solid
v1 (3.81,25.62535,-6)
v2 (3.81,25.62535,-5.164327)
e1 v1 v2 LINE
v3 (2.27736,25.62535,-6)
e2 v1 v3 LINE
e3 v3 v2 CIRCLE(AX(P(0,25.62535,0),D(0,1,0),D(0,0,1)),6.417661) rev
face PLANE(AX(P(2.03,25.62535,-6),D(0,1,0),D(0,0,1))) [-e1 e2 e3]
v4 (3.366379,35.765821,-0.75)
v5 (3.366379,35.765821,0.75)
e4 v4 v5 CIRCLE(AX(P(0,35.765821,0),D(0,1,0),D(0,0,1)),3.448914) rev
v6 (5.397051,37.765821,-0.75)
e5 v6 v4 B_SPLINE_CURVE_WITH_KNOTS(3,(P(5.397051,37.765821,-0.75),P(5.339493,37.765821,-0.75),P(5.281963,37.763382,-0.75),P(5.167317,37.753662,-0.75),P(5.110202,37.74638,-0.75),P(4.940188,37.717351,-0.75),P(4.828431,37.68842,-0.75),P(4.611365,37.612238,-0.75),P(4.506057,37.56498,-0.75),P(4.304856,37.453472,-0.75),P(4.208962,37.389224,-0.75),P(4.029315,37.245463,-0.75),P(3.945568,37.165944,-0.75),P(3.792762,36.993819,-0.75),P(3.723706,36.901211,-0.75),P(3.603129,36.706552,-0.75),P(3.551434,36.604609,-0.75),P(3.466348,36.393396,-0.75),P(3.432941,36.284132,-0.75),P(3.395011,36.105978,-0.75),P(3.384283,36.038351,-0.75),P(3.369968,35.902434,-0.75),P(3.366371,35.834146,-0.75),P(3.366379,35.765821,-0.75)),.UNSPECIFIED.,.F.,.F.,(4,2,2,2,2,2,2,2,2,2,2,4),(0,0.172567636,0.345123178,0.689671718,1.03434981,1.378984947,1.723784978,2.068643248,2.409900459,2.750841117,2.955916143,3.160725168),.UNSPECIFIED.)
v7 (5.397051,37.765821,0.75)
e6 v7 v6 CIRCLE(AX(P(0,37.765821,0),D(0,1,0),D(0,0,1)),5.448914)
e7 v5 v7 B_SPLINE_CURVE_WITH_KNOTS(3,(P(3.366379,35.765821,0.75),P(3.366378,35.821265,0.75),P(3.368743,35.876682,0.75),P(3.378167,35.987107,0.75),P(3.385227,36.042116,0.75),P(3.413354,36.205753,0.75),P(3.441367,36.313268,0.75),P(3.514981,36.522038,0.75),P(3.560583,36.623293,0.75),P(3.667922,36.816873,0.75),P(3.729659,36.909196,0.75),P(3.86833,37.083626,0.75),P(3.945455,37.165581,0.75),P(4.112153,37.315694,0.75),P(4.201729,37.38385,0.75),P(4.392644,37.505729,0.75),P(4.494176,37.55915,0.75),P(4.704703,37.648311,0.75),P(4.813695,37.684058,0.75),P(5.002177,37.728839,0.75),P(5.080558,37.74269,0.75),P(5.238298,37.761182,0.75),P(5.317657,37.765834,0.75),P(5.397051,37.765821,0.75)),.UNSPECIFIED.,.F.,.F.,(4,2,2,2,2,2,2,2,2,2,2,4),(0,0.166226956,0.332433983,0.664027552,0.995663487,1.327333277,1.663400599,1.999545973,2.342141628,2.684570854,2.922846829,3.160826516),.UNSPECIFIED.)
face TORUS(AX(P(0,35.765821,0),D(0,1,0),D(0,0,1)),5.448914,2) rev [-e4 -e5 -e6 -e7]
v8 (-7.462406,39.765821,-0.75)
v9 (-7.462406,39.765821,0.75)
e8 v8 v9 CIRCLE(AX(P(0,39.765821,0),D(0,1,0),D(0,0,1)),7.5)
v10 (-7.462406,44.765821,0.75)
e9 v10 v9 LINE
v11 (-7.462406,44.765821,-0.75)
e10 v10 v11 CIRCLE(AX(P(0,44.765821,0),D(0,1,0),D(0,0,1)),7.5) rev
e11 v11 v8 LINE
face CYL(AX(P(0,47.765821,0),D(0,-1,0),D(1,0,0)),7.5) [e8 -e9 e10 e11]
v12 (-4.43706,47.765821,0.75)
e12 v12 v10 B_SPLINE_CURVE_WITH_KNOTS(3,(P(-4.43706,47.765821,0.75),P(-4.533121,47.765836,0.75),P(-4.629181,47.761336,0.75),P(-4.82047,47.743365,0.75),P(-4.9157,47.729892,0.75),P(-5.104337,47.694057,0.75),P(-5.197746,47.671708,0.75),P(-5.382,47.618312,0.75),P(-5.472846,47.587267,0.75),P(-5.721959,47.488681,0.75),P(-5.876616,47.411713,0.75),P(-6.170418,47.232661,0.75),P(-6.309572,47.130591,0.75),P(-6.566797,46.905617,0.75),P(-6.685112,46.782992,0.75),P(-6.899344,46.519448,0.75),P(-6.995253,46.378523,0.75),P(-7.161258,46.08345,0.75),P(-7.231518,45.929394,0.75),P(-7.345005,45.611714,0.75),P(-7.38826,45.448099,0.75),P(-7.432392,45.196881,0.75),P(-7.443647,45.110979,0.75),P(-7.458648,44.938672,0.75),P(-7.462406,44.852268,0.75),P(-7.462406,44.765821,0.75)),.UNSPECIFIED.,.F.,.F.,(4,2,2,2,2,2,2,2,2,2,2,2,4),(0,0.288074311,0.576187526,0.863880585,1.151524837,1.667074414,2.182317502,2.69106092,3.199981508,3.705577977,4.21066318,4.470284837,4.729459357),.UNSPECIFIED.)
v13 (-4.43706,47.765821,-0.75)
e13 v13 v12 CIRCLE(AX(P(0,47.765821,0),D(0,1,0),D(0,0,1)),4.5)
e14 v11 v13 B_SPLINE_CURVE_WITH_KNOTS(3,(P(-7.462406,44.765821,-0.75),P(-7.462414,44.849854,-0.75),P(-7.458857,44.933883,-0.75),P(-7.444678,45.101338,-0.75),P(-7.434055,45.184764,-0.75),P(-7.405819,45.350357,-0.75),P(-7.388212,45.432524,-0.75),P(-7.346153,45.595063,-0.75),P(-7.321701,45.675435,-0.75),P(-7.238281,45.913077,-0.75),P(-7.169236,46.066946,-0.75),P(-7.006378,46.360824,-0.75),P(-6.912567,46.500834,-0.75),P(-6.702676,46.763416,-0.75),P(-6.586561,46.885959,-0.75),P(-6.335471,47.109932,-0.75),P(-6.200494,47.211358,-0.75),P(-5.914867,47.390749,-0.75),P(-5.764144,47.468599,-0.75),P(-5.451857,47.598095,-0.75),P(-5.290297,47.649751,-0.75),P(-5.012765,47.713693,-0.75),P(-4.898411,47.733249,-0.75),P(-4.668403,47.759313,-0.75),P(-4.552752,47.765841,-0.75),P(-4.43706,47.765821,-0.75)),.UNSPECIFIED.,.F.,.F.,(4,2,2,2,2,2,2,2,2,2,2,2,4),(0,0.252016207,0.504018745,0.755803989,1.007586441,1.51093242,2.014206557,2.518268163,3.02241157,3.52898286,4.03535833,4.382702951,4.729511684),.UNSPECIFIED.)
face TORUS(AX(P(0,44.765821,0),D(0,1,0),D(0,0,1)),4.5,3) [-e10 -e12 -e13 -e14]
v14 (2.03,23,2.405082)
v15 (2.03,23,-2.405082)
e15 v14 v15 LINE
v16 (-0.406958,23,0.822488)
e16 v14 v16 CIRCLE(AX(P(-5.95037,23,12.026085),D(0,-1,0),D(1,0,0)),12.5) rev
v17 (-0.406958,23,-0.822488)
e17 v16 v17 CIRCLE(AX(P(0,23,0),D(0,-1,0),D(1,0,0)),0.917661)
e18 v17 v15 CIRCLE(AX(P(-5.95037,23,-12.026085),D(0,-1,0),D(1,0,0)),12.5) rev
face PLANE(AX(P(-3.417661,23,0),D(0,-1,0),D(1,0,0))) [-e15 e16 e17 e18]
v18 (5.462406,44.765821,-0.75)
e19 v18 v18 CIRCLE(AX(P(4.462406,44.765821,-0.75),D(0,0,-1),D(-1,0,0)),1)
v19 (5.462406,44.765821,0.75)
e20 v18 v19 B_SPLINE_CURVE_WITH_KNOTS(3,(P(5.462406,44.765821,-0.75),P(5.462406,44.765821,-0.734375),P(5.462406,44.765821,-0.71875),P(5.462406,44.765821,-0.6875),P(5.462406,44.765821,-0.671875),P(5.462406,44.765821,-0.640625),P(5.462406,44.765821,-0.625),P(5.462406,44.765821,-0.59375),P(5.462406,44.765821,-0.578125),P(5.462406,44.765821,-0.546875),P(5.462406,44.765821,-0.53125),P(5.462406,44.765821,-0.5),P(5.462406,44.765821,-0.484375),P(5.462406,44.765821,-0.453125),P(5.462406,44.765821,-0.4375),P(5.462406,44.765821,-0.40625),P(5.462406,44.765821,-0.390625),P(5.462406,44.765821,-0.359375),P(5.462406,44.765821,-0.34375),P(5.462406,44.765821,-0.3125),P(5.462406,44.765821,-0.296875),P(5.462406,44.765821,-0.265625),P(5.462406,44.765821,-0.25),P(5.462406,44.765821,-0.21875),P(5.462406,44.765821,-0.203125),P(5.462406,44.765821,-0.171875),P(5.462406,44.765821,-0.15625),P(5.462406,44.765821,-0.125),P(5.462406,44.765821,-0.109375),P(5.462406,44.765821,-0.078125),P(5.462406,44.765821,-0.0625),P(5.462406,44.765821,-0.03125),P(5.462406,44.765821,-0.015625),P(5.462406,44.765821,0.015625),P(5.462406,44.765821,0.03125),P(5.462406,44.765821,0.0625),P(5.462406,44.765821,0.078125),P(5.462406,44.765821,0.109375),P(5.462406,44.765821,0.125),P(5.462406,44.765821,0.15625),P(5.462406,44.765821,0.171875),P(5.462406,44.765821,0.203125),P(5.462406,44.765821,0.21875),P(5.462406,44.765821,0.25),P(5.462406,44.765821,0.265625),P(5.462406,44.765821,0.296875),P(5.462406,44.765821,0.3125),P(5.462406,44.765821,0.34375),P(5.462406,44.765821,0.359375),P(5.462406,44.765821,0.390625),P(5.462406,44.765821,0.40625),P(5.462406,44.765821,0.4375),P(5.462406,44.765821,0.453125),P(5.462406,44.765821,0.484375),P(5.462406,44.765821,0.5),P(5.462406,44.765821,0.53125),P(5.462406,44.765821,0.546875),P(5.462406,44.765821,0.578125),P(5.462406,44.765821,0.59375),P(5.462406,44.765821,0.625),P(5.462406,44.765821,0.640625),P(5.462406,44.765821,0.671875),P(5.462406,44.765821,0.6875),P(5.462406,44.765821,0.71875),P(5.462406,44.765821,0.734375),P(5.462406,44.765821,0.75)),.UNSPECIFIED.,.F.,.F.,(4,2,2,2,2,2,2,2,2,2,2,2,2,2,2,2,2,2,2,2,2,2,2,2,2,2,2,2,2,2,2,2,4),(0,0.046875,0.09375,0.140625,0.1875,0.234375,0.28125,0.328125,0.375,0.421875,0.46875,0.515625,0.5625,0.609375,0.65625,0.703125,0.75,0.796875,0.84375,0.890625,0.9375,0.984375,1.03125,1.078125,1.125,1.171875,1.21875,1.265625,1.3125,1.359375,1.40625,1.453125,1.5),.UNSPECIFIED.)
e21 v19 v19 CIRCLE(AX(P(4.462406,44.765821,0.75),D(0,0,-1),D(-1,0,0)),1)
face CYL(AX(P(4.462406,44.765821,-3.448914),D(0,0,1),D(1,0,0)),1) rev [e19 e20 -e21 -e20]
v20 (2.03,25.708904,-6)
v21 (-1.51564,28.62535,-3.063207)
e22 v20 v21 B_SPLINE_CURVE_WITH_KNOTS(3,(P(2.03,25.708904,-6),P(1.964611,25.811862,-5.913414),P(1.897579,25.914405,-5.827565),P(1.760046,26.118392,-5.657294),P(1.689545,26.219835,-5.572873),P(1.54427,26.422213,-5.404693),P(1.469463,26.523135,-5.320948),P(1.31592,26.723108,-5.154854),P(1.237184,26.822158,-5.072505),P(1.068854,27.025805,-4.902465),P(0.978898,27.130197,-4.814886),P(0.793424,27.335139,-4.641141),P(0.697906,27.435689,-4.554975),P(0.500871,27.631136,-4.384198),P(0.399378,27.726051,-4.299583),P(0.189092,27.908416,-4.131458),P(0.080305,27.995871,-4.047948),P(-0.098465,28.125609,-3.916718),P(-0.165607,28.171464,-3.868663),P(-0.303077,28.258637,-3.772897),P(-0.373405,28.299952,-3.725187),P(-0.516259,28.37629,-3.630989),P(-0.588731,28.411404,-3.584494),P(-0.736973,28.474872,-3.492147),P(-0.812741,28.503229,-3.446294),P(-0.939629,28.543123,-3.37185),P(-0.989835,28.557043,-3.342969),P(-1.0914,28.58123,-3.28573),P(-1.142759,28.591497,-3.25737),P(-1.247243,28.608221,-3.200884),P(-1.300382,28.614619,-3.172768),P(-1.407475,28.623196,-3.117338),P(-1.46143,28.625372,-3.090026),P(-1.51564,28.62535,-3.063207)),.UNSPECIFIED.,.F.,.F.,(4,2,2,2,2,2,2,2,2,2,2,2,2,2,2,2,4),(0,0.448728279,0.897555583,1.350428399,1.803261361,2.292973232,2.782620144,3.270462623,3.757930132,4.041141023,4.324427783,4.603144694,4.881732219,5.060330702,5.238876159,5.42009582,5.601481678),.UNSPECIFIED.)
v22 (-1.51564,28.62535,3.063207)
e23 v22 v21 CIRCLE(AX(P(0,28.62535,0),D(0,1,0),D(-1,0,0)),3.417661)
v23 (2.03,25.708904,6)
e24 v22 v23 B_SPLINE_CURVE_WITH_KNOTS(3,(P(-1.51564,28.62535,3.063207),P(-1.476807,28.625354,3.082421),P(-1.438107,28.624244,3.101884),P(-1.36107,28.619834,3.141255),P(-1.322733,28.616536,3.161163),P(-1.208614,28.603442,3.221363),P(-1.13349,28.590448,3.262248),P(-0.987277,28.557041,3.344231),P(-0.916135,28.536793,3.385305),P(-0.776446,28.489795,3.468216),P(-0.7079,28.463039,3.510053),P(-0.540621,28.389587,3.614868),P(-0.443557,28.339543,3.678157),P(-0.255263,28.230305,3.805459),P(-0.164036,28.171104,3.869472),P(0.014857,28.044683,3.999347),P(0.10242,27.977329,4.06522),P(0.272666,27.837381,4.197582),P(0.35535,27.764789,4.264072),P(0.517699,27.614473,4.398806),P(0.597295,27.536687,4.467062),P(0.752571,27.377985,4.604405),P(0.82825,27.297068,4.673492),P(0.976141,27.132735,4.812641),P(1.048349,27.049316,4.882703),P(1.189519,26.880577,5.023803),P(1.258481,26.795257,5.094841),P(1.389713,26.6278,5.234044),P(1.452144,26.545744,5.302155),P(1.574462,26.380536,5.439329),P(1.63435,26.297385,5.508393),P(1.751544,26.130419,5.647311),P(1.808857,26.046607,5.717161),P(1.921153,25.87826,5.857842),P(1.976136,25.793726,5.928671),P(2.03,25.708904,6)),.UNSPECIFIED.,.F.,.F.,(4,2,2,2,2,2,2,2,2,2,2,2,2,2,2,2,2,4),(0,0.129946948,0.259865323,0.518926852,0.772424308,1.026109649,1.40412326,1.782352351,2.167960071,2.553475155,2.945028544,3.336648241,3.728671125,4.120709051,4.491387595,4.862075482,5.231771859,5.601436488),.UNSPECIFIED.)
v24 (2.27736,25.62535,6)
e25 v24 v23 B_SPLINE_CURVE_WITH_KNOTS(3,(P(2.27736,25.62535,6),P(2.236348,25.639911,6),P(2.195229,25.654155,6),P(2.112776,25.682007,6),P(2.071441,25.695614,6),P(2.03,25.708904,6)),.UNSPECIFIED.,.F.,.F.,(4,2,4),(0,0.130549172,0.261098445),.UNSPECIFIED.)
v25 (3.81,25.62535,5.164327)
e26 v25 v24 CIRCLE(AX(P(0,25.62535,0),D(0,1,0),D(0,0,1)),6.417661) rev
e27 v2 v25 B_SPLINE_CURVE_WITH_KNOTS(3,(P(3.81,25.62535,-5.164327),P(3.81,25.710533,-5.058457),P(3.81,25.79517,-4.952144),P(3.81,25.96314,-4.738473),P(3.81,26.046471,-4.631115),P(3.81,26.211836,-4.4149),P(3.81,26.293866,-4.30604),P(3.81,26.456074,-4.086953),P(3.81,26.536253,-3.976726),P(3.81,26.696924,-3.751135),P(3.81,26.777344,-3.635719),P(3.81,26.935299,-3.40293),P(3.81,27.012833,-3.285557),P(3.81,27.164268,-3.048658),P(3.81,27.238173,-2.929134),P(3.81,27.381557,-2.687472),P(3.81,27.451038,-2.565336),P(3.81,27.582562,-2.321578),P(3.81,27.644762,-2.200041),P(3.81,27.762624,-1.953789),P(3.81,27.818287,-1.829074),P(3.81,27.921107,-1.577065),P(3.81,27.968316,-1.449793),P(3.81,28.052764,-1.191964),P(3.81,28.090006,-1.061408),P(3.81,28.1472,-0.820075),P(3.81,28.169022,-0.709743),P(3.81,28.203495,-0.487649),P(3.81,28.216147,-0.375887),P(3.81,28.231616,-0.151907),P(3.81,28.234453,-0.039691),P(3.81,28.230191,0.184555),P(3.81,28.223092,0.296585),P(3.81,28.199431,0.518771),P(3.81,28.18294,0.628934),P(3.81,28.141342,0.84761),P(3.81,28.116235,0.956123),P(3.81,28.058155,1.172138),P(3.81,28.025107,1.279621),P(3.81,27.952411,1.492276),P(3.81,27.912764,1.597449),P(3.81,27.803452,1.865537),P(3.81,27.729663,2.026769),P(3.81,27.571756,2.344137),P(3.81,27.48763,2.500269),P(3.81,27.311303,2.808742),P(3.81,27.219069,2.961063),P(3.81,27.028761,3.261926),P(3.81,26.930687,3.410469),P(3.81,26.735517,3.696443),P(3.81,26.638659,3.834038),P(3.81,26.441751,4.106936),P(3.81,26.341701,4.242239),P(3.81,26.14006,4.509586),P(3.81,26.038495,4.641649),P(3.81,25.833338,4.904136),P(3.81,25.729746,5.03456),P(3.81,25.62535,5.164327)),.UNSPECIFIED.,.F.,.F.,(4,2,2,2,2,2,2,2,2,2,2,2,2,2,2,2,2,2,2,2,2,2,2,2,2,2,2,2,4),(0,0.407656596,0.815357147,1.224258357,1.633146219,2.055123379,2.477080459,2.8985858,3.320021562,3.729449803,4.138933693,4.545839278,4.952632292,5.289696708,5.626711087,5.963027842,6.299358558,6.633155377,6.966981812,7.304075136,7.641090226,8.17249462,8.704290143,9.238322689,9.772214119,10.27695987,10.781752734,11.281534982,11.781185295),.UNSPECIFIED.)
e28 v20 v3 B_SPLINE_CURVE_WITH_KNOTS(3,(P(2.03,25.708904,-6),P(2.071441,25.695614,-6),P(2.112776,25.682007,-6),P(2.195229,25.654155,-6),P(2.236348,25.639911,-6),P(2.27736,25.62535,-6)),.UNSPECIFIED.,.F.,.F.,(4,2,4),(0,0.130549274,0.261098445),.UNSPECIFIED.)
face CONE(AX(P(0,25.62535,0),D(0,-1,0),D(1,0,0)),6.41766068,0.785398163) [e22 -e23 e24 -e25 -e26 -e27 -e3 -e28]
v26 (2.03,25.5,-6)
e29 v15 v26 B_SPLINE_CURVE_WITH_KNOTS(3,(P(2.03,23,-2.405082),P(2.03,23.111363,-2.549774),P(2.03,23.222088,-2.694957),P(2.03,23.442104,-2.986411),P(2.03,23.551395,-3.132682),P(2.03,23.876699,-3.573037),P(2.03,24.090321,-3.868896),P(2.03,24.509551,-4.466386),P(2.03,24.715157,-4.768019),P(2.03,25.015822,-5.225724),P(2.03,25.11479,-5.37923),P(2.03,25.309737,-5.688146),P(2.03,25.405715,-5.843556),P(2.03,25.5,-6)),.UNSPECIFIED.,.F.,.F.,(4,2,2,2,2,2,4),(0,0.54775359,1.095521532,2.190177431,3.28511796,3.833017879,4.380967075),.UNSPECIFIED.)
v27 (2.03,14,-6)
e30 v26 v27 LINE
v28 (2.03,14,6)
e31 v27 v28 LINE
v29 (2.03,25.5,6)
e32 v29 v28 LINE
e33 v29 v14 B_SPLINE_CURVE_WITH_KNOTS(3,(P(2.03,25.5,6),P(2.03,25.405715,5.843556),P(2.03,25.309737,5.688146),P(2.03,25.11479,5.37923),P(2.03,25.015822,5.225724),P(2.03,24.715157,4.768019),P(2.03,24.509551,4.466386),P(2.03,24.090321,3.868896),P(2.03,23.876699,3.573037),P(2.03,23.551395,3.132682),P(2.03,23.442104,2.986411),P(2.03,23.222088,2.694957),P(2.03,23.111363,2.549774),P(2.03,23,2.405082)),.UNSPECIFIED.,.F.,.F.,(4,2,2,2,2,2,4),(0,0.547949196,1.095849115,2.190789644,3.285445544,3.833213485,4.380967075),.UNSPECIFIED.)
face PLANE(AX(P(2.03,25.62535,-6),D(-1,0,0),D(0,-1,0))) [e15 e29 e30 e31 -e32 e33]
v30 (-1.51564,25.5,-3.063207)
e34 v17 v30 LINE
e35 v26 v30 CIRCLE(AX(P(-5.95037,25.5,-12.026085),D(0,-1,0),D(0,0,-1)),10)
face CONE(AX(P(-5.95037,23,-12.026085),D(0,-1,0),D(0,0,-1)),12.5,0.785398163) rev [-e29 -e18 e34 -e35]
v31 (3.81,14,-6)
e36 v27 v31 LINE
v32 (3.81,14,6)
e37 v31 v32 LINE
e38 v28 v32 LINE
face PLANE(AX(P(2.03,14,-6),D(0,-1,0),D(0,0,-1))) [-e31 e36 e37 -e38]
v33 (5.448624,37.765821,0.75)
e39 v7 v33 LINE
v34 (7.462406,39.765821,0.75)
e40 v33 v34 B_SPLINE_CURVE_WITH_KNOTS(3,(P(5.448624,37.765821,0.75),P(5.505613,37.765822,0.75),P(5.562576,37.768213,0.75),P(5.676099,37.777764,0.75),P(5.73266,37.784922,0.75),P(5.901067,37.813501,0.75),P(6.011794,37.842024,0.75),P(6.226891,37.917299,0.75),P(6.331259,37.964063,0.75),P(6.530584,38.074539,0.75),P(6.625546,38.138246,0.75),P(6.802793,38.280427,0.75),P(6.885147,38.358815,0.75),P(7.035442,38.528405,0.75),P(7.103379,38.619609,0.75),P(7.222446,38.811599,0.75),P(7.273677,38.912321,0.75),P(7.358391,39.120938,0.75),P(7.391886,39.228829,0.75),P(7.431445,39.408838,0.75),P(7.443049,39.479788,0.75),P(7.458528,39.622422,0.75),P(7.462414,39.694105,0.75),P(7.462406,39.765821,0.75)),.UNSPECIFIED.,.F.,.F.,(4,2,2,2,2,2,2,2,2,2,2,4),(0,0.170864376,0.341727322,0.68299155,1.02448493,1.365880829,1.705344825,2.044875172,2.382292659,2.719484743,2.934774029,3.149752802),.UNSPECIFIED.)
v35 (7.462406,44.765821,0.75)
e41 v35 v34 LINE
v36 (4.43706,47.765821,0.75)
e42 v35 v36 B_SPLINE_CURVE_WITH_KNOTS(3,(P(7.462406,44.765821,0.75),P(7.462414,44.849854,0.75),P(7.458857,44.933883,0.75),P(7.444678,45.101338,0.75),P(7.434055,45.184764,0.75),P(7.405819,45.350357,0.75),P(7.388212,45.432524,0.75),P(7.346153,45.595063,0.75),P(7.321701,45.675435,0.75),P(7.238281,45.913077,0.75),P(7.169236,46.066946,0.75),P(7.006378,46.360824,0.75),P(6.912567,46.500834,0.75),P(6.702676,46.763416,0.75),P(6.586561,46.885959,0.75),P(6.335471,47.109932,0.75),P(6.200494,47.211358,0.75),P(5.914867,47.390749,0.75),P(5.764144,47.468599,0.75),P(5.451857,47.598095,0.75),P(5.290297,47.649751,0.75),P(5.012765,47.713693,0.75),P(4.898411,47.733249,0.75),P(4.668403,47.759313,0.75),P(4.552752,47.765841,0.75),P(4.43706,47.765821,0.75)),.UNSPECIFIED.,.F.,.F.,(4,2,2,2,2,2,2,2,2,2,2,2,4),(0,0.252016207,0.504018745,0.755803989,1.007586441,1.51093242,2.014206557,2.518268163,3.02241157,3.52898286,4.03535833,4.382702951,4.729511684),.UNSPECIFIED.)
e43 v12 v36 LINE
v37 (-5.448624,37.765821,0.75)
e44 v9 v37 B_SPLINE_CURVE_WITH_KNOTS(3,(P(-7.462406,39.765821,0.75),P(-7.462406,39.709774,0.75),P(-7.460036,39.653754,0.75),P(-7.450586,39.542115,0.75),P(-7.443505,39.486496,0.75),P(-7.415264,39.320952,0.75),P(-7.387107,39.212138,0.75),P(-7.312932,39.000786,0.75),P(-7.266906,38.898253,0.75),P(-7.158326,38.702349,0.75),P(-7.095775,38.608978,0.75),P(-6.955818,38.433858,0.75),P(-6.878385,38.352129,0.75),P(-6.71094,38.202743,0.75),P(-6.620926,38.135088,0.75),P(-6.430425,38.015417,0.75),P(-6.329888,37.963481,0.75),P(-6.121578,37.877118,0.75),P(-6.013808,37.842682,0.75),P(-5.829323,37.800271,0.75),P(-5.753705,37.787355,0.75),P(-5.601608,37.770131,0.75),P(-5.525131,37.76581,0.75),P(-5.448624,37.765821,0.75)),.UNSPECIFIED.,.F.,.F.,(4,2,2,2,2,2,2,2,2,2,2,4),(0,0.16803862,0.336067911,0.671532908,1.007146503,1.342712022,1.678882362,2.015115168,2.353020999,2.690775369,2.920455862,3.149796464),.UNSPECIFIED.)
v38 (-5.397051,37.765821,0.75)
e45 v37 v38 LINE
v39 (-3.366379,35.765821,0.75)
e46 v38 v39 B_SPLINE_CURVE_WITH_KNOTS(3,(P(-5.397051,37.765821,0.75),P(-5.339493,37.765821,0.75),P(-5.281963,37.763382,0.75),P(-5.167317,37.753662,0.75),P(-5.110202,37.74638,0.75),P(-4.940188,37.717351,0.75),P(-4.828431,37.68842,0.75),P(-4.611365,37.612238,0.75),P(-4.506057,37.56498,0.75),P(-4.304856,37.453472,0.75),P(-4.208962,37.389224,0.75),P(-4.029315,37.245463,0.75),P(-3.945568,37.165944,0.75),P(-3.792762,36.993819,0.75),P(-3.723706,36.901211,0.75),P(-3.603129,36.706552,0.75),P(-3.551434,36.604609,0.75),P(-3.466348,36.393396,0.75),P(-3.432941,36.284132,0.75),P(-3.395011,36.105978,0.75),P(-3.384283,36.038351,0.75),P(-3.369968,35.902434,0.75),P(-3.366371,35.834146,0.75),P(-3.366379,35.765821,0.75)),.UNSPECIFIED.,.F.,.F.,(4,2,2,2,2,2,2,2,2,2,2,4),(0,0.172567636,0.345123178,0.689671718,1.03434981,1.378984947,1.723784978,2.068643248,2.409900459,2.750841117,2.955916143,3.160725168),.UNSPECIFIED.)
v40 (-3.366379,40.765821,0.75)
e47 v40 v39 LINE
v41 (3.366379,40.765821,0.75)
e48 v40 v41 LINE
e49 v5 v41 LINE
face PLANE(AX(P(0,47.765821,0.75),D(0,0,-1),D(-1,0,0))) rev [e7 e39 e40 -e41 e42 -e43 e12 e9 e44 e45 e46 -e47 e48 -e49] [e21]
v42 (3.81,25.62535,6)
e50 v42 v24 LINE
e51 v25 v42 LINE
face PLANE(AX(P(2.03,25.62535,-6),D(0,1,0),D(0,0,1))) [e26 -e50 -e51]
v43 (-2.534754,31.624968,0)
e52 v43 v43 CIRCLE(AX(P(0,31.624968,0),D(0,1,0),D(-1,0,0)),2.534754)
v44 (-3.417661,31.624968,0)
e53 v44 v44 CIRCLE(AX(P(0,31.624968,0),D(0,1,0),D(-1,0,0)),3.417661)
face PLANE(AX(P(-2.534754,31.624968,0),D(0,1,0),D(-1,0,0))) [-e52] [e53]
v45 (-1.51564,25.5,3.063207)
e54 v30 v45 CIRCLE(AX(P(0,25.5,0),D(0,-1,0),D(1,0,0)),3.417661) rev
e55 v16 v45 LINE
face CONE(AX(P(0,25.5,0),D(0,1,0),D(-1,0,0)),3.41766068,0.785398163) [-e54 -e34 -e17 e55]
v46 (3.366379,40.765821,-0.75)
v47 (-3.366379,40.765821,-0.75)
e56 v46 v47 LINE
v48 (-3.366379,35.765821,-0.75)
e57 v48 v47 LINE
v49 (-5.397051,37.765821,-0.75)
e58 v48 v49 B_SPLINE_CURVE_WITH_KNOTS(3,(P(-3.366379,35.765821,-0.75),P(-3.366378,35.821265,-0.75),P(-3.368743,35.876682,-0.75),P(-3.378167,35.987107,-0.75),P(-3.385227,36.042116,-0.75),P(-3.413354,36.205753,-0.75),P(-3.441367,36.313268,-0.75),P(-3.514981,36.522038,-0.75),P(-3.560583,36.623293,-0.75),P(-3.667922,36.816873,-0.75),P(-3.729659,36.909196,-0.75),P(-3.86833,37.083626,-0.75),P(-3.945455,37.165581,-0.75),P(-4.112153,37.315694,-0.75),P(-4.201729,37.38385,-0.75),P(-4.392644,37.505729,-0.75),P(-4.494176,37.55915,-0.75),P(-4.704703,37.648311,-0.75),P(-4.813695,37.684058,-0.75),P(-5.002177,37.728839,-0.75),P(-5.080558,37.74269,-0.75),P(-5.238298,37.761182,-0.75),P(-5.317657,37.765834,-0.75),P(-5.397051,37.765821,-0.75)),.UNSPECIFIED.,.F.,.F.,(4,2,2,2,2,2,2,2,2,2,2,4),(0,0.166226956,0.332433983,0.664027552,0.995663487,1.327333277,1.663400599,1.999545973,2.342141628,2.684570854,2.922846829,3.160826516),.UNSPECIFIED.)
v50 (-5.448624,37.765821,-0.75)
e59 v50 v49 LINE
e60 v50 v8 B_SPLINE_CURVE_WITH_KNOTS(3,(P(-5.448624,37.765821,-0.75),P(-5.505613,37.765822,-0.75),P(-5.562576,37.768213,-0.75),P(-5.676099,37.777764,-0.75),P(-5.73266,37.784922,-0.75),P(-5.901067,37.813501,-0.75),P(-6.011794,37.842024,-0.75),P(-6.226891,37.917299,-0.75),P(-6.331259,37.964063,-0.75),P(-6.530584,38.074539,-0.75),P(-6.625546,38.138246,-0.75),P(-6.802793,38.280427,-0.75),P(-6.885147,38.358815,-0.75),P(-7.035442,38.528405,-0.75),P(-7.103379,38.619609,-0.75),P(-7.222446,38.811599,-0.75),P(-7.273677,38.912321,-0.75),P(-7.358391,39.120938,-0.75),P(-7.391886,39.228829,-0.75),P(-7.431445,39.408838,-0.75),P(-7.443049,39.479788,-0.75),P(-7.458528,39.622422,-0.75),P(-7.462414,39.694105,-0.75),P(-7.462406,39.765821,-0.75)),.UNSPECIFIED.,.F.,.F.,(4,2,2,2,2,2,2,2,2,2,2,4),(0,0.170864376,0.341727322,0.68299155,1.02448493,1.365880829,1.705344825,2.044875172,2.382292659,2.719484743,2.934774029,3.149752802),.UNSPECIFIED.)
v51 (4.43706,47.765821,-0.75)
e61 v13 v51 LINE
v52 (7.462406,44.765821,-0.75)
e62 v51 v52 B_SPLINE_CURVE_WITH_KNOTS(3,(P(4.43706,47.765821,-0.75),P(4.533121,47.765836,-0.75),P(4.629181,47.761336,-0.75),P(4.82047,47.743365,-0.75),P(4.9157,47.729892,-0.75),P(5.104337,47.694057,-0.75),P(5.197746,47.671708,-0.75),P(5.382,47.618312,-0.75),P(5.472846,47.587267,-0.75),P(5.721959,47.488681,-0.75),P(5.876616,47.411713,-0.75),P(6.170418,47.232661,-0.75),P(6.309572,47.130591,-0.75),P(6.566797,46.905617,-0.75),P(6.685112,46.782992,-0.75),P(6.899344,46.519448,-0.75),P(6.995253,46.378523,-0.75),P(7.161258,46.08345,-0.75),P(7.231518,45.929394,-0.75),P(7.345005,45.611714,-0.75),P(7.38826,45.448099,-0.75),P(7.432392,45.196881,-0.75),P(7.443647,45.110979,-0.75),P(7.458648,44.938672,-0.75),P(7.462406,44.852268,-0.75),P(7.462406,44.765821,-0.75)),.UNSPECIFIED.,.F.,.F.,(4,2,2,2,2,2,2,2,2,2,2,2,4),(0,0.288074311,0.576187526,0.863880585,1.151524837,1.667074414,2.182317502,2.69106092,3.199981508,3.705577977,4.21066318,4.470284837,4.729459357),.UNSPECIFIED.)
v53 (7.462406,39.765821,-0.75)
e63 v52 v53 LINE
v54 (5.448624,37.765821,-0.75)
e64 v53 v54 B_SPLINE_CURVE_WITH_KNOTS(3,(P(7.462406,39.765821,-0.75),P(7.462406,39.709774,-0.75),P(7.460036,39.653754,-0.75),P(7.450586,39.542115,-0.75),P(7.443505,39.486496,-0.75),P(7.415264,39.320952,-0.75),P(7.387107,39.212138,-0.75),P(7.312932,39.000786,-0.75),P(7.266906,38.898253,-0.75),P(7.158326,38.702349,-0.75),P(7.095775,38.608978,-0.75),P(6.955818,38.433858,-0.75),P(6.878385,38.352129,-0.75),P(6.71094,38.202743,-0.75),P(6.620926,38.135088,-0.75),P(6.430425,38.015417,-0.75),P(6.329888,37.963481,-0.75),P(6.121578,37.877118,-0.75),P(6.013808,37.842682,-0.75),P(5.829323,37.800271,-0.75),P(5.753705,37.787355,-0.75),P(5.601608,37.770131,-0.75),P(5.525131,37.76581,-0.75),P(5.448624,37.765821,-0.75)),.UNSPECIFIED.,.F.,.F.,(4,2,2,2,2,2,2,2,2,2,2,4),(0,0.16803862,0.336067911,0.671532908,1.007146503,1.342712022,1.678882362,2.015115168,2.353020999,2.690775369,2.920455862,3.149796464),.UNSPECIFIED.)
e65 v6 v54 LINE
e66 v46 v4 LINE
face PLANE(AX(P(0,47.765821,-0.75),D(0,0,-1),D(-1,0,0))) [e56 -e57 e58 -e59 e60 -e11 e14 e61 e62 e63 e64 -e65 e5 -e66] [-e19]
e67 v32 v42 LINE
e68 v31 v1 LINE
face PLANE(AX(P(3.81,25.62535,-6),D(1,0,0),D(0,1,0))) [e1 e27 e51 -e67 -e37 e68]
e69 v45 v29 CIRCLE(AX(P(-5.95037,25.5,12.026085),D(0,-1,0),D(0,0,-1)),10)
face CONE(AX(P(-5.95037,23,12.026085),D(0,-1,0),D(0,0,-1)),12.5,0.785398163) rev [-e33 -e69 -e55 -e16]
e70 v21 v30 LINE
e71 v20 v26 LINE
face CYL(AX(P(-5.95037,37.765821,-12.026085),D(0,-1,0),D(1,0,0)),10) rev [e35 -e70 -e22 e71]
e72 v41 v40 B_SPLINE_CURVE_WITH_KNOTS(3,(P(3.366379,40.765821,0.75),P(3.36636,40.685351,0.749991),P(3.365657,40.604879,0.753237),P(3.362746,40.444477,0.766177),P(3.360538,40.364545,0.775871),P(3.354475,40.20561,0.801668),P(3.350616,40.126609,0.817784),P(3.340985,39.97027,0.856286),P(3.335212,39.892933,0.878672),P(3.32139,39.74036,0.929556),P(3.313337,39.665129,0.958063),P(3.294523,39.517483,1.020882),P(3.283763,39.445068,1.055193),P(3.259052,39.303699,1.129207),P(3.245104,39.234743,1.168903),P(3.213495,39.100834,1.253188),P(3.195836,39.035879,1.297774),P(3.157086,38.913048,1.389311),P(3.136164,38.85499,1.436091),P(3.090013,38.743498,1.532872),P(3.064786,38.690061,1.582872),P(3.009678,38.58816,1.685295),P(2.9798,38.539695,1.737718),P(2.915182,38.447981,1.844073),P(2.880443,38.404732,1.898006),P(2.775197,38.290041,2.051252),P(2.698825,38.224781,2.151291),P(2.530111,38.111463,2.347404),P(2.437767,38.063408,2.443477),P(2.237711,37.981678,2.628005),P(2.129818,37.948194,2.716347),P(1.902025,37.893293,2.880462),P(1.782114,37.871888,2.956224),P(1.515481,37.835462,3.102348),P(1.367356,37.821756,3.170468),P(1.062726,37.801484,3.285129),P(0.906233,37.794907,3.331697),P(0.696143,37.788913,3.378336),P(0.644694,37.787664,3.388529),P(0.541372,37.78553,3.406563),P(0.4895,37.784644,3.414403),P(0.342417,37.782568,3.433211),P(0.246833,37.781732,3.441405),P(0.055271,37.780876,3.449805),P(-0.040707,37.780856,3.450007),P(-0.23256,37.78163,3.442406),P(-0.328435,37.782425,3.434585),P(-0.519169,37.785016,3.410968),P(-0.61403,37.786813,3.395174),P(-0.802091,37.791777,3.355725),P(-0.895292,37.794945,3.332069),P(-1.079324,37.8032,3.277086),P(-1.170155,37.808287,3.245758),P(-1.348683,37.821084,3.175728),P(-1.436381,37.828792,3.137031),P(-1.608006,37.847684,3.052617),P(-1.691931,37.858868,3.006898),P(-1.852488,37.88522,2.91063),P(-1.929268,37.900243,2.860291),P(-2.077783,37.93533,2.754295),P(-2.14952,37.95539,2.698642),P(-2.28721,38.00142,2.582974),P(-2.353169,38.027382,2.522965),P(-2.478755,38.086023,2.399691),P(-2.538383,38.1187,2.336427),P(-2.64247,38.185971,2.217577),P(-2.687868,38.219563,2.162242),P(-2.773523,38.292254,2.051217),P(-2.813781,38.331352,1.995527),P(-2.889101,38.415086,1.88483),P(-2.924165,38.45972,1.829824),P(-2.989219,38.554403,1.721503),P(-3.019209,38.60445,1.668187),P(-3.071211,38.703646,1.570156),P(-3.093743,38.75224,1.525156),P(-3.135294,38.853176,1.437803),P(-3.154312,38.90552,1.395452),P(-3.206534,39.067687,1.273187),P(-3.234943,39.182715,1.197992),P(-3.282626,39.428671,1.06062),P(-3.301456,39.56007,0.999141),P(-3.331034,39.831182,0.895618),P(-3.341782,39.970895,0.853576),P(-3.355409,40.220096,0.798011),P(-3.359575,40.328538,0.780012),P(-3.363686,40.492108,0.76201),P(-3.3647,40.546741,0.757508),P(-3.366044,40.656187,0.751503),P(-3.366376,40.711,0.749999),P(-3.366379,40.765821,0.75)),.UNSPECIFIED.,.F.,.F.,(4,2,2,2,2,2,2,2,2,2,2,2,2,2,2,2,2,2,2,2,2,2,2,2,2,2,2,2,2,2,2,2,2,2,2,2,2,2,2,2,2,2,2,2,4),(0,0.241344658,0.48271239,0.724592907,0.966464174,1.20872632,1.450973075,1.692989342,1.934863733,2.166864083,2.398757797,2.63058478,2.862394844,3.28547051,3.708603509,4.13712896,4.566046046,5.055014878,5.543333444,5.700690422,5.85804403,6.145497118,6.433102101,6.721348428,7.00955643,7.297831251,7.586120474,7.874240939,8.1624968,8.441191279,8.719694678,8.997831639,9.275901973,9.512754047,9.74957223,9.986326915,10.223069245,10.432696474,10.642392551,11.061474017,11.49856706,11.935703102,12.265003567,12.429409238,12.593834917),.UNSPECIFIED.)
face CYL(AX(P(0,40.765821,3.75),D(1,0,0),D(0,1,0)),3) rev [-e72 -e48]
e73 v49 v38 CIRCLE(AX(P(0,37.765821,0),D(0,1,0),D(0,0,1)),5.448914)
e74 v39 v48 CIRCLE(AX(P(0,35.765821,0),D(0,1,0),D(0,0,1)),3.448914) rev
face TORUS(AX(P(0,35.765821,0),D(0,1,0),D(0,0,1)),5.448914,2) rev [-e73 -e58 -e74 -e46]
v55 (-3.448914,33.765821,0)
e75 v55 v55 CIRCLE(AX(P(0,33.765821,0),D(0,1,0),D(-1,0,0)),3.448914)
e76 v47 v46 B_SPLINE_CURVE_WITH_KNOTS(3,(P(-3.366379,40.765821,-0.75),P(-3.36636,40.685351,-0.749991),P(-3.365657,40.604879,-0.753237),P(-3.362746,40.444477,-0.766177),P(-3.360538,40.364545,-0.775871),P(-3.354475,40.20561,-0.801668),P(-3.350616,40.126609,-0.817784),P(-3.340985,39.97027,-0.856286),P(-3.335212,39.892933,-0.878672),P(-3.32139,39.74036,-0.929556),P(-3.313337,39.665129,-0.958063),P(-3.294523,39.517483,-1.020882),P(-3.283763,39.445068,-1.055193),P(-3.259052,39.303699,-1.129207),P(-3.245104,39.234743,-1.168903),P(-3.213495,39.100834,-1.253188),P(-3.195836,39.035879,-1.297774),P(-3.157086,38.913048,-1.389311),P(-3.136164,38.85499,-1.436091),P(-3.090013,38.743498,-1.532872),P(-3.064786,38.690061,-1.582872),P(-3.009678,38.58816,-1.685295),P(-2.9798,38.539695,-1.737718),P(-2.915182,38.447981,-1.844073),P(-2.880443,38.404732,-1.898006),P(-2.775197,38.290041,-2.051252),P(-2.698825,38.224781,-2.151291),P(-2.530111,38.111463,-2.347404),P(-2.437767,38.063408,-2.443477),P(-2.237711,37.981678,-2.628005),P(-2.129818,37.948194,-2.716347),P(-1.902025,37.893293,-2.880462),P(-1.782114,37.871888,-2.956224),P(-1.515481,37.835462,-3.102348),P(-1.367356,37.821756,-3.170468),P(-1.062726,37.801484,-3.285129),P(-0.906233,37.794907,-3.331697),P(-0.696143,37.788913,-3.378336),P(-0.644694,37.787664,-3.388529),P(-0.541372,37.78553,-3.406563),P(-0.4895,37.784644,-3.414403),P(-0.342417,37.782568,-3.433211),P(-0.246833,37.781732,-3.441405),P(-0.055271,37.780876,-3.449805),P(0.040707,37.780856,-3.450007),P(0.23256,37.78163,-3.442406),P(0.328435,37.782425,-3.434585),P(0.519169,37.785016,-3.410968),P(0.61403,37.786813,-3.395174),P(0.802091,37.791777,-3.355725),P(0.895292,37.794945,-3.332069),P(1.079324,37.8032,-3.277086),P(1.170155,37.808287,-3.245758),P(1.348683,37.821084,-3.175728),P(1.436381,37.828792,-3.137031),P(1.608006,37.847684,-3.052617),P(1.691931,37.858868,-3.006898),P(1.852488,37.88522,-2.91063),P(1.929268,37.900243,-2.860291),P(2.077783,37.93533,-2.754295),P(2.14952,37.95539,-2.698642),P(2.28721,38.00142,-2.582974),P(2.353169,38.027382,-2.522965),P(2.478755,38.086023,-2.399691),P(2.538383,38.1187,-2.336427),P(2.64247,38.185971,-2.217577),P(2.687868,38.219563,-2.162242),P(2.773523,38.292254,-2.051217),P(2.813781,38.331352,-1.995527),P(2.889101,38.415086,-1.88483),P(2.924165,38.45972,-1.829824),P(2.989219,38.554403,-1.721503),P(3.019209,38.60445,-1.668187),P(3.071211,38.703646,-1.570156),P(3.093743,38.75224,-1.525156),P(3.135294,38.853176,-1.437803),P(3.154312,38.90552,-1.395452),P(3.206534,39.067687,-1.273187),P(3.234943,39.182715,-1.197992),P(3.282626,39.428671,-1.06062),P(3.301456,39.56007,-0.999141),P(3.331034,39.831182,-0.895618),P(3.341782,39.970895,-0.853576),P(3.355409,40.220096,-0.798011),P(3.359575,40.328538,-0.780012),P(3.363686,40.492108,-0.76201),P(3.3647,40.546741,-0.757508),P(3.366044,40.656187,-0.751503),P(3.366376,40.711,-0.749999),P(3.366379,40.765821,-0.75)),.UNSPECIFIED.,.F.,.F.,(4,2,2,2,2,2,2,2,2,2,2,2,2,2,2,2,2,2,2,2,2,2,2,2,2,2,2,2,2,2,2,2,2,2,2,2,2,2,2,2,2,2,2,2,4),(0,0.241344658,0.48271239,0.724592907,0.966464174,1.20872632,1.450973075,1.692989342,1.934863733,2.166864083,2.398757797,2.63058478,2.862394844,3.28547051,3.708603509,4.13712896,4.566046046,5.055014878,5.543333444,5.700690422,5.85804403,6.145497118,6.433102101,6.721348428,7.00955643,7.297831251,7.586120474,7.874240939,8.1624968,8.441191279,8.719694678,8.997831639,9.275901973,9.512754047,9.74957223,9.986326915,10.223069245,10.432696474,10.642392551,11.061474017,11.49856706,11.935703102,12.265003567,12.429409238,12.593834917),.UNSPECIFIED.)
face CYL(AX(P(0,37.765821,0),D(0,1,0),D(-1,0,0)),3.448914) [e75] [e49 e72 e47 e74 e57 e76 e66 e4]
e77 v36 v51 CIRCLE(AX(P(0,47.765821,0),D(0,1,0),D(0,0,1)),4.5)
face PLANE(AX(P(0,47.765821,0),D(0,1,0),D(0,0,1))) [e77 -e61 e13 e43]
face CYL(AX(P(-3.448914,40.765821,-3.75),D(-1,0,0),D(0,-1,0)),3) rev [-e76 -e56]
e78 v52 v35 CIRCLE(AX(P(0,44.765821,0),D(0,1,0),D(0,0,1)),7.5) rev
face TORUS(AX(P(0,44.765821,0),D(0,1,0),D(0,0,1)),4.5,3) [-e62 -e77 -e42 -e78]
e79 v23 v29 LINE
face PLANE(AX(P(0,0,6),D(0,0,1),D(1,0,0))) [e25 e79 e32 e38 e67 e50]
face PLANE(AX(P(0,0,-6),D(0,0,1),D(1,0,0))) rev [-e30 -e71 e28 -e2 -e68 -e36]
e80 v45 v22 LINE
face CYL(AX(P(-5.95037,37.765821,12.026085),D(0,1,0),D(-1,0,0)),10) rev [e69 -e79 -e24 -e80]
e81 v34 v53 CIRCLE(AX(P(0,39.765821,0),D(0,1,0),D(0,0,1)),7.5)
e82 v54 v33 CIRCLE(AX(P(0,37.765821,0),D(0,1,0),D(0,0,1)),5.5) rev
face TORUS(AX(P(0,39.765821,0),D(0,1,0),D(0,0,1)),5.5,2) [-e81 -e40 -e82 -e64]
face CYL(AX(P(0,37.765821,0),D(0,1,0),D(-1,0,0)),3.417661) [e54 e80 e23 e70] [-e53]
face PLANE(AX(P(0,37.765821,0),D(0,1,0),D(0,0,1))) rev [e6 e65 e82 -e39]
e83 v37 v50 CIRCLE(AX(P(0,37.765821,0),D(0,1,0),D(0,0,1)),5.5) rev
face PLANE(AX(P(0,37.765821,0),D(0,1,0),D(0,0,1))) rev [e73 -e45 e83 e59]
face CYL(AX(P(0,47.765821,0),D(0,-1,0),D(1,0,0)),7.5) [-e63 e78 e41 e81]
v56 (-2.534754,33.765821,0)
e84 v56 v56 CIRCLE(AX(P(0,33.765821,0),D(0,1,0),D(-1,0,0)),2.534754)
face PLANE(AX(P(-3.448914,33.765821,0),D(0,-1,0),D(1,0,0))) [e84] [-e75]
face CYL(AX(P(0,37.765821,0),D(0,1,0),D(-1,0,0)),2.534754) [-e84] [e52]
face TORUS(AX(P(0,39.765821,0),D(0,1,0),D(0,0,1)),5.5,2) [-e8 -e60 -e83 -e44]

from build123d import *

# Parameters (mm, degrees)
BOSS_EXTRUDE1_DEPTH      = 10
FILLET2_R                = 2
FILLET3_R                = 3
CUT_EXTRUDE1_DEPTH       = 49.473897211
CUT_EXTRUDE1_DEPTH_BACK  = 49.473897211
SKETCH3_R                = 1
BOSS_EXTRUDE2_DEPTH      = 6
BOSS_EXTRUDE2_DEPTH_BACK = 6
SKETCH4_W                = 1.78
SKETCH4_H                = 11.625349657
CHAMFER1_SIZE            = 3
FILLET4_START            = 23
FILLET4_DEPTH            = 2.747219164
FILLET4_START_2          = 25.747219164
FILLET4_2_DEPTH          = 2.878130593
CHAMFER2_SIZE            = 2.5


with BuildPart() as part:
    # Sketch1 → Revolve1 (revolve)
    with BuildSketch(Plane.XY):
        Polygon((-3.448914015, 37.765821371), (-3.448914015, 33.765821371), (-2.534753992, 33.765821371), (-2.534753992, 31.624967984), (-3.41766068, 31.624967984), (-3.41766068, 23), (0, 23), (0, 37.765821371), align=None)
    revolve(axis=Axis((0, 37.765821371, 0), (0, -1, 0)))

    # Sketch2 → Boss-Extrude1 (add)
    with BuildSketch(Plane(origin=(0, 37.765821371, 0), x_dir=(1, 0, 0), z_dir=(0, 1, 0))):
        with BuildLine():
            Line((3.366379046, 0.75), (-3.366379046, 0.75))
            ThreePointArc((-3.366379046, 0.75), (-3.448914015, 0), (-3.366379046, -0.75))
            Line((-3.366379046, -0.75), (3.366379046, -0.75))
            ThreePointArc((3.366379046, -0.75), (3.428218178, -0.37726384), (3.448914015, 0))
            ThreePointArc((3.448914015, 0), (3.428218178, 0.37726384), (3.366379046, 0.75))
        make_face()
        with BuildLine():
            Line((-3.366379046, 0.75), (-7.462405778, 0.75))
            ThreePointArc((-7.462405778, 0.75), (-7.5, 0), (-7.462405778, -0.75))
            Line((-7.462405778, -0.75), (-3.366379046, -0.75))
            ThreePointArc((-3.366379046, -0.75), (-3.448914015, 0), (-3.366379046, 0.75))
        make_face()
        with BuildLine():
            ThreePointArc((7.5, 0), (7.490595548, 0.375470813), (7.462405778, 0.75))
            Line((7.462405778, 0.75), (3.366379046, 0.75))
            ThreePointArc((3.366379046, 0.75), (3.428218178, 0.37726384), (3.448914015, 0))
            ThreePointArc((3.448914015, 0), (3.428218178, -0.37726384), (3.366379046, -0.75))
            Line((3.366379046, -0.75), (7.462405778, -0.75))
            ThreePointArc((7.462405778, -0.75), (7.490595548, -0.375470813), (7.5, 0))
        make_face()
    extrude(amount=BOSS_EXTRUDE1_DEPTH)

    # Fillet2
    # the kernel refuses this fillet: 2 mm, written as the material it adds along each edge
    with BuildSketch(Plane(origin=(0, 37.765821371, 0), x_dir=(-0.09803421101524086, 0, -0.9951830452085783), z_dir=(-0.9951830452085783, 0, 0.09803421101524086))) as fillet2_piece_1_section:
        with BuildLine():
            CenterArc((3.448914015 + FILLET2_R, FILLET2_R), FILLET2_R, 180, 90)
            Line((3.448914015 + FILLET2_R, 0), (3.448914015, 0))
            Line((3.448914015, 0), (3.448914015, FILLET2_R))
        make_face()
    fillet2_piece_1 = revolve(axis=Axis((0, 37.765821371, 0), (0, -1, 0)), revolution_arc=191.251965623, mode=Mode.PRIVATE)
    fillet2_piece_1 = split(fillet2_piece_1, bisect_by=Plane(origin=(0, 37.765821371, -0.75), z_dir=(0, 0, 1)), keep=Keep.TOP, mode=Mode.PRIVATE)
    fillet2_piece_1 = split(fillet2_piece_1, bisect_by=Plane(origin=(0, 37.765821371, 0.75), z_dir=(0, 0, -1)), keep=Keep.TOP, mode=Mode.PRIVATE)
    add(fillet2_piece_1)
    with BuildSketch(Plane(origin=(0, 37.765821371, 0), x_dir=(0.09800035789508027, 0, 0.9951863794548418), z_dir=(0.9951863794548418, 0, -0.09800035789508027))) as fillet2_piece_2_section:
        with BuildLine():
            CenterArc((3.448914015 + FILLET2_R, FILLET2_R), FILLET2_R, 180, 90)
            Line((3.448914015 + FILLET2_R, 0), (3.448914015, 0))
            Line((3.448914015, 0), (3.448914015, FILLET2_R))
        make_face()
    fillet2_piece_2 = revolve(axis=Axis((0, 37.765821371, 0), (0, -1, 0)), revolution_arc=95.624033786, mode=Mode.PRIVATE)
    fillet2_piece_2 = split(fillet2_piece_2, bisect_by=Plane(origin=(0, 37.765821371, 0.75), z_dir=(0, 0, -1)), keep=Keep.TOP, mode=Mode.PRIVATE)
    add(fillet2_piece_2)
    with BuildSketch(Plane(origin=(0, 37.765821371, 0), x_dir=(-1, 0, 0), z_dir=(0, 0, 1))) as fillet2_piece_3_section:
        with BuildLine():
            CenterArc((3.448914015 + FILLET2_R, FILLET2_R), FILLET2_R, 180, 90)
            Line((3.448914015 + FILLET2_R, 0), (3.448914015, 0))
            Line((3.448914015, 0), (3.448914015, FILLET2_R))
        make_face()
    fillet2_piece_3 = revolve(axis=Axis((0, 37.765821371, 0), (0, -1, 0)), revolution_arc=95.624033786, mode=Mode.PRIVATE)
    fillet2_piece_3 = split(fillet2_piece_3, bisect_by=Plane(origin=(0, 37.765821371, -0.75), z_dir=(0, 0, 1)), keep=Keep.TOP, mode=Mode.PRIVATE)
    add(fillet2_piece_3)
    # the kernel refuses this fillet: 2 mm, written as the material it takes off along each edge
    with BuildSketch(Plane(origin=(0, 37.765821371, 0), x_dir=(-0.7201079494948177, 0, -0.6938620475817721), z_dir=(0.6938620475817721, 0, -0.7201079494948177))) as fillet2_2_piece_1:
        with BuildLine():
            CenterArc((7.5 - FILLET2_R, FILLET2_R), FILLET2_R, 270, 90)
            Line((7.5, FILLET2_R), (7.5, 0))
            Line((7.5, 0), (7.5 - FILLET2_R, 0))
        make_face()
    revolve(axis=Axis((0, 37.765821371, 0), (0, 1, 0)), revolution_arc=87.873212667, mode=Mode.SUBTRACT)
    with BuildSketch(Plane(origin=(0, 37.765821371, 0), x_dir=(0.7201079494948216, 0, 0.6938620475817678), z_dir=(-0.6938620475817678, 0, 0.7201079494948216))) as fillet2_2_piece_2:
        with BuildLine():
            CenterArc((7.5 - FILLET2_R, FILLET2_R), FILLET2_R, 270, 90)
            Line((7.5 - FILLET2_R, 0), (7.5, 0))
            Line((7.5, 0), (7.5, FILLET2_R))
        make_face()
    revolve(axis=Axis((0, 37.765821371, 0), (0, 1, 0)), revolution_arc=87.873212667, mode=Mode.SUBTRACT)

    # Fillet3
    # the kernel refuses this fillet: 3 mm, written as the material it adds along each edge
    with BuildSketch(Plane(origin=(10.866379046, 37.765821371, -0.75), x_dir=(0, 1, 0), z_dir=(-1, 0, 0))) as fillet3_piece_1_section:
        with BuildLine():
            CenterArc((FILLET3_R, FILLET3_R), FILLET3_R, 180, 90)
            Line((0, FILLET3_R), (0, 0))
            Line((0, 0), (FILLET3_R, 0))
        make_face()
    fillet3_piece_1 = extrude(amount=21.732758092, mode=Mode.PRIVATE)
    fillet3_piece_1 = fillet3_piece_1 & Plane(origin=(0, 37.765821371, 0), x_dir=(-1, 0, 0), z_dir=(0, -1, 0)) * Cylinder(3.448914015, 56, mode=Mode.PRIVATE)
    add(fillet3_piece_1)
    with BuildSketch(Plane(origin=(10.866379046, 37.765821371, 0.75), x_dir=(0, 1, 0), z_dir=(-1, 0, 0))) as fillet3_piece_2_section:
        with BuildLine():
            CenterArc((FILLET3_R, -FILLET3_R), FILLET3_R, 90, 90)
            Line((0, -FILLET3_R), (0, 0))
            Line((0, 0), (FILLET3_R, 0))
        make_face()
    fillet3_piece_2 = extrude(amount=21.732758092, mode=Mode.PRIVATE)
    fillet3_piece_2 = fillet3_piece_2 & Plane(origin=(0, 37.765821371, 0), x_dir=(-1, 0, 0), z_dir=(0, -1, 0)) * Cylinder(3.448914015, 56, mode=Mode.PRIVATE)
    add(fillet3_piece_2)
    # the kernel refuses this fillet: 3 mm, written as the material it takes off along each edge
    with BuildSketch(Plane(origin=(0, 47.765821371, 0), x_dir=(-0.4534410859899706, 0, -0.8912862511764871), z_dir=(0.8912862511764871, 0, -0.4534410859899706))) as fillet3_2_piece_1:
        with BuildLine():
            CenterArc((7.5 - FILLET3_R, -FILLET3_R), FILLET3_R, 0, 90)
            Line((7.5 - FILLET3_R, 0), (7.5, 0))
            Line((7.5, 0), (7.5, -FILLET3_R))
        make_face()
    revolve(axis=Axis((0, 47.765821371, 0), (0, 1, 0)), revolution_arc=126.070648523, mode=Mode.SUBTRACT)
    with BuildSketch(Plane(origin=(0, 47.765821371, 0), x_dir=(0.4534410859901425, 0, -0.8912862511763997), z_dir=(-0.8912862511763997, 0, -0.4534410859901425))) as fillet3_2_piece_2:
        with BuildLine():
            CenterArc((7.5 - FILLET3_R, FILLET3_R), FILLET3_R, 270, 90)
            Line((7.5, FILLET3_R), (7.5, 0))
            Line((7.5, 0), (7.5 - FILLET3_R, 0))
        make_face()
    revolve(axis=Axis((0, 47.765821371, 0), (0, -1, 0)), revolution_arc=126.070648523, mode=Mode.SUBTRACT)

    # Sketch3 → Cut-Extrude1 (cut, two sides: drawn at the far end of the back side and taken through both)
    with BuildSketch(Plane.XY.offset(-CUT_EXTRUDE1_DEPTH_BACK)):
        with Locations((4.462405778, 44.765821371)):
            Circle(SKETCH3_R)
    extrude(amount=CUT_EXTRUDE1_DEPTH + CUT_EXTRUDE1_DEPTH_BACK, mode=Mode.SUBTRACT)

    # Sketch4 → Boss-Extrude2 (add, two sides: drawn at the far end of the back side and taken through both)
    with BuildSketch(Plane.XY.offset(-BOSS_EXTRUDE2_DEPTH_BACK)):
        with Locations((2.92, 19.812674829)):
            Rectangle(SKETCH4_W, SKETCH4_H)
    extrude(amount=BOSS_EXTRUDE2_DEPTH + BOSS_EXTRUDE2_DEPTH_BACK)

    # Chamfer1
    # the kernel refuses this chamfer: 3 mm, written as the material it adds along each edge
    with BuildSketch(Plane(origin=(0, 25.625349657, 0), x_dir=(-0.9999950652018582, 0, -0.003141587485879368), z_dir=(-0.003141587485879368, 0, 0.9999950652018582))) as chamfer1_piece_1_section:
        Polygon((3.41766068, -CHAMFER1_SIZE), (3.41766068 + CHAMFER1_SIZE, 0), (3.41766068, 0), align=None)
    chamfer1_piece_1 = revolve(axis=Axis((0, 25.625349657, 0), (0, -1, 0)), revolution_arc=359.64, mode=Mode.PRIVATE)
    chamfer1_piece_1 = split(chamfer1_piece_1, bisect_by=Plane(origin=(2.03, 25.625349657, 0), z_dir=(1, 0, 0)), keep=Keep.TOP, mode=Mode.PRIVATE)
    chamfer1_piece_1 = split(chamfer1_piece_1, bisect_by=Plane(origin=(0, 25.625349657, -6), z_dir=(0, 0, 1)), keep=Keep.TOP, mode=Mode.PRIVATE)
    chamfer1_piece_1 = split(chamfer1_piece_1, bisect_by=Plane(origin=(3.81, 25.625349657, 0), z_dir=(-1, 0, 0)), keep=Keep.TOP, mode=Mode.PRIVATE)
    chamfer1_piece_1 = split(chamfer1_piece_1, bisect_by=Plane(origin=(0, 25.625349657, 6), z_dir=(0, 0, -1)), keep=Keep.TOP, mode=Mode.PRIVATE)
    add(chamfer1_piece_1)

    # Fillet4: read off the stored shape, not the designer's step
    # Fillet4 outline → Fillet4 (add)
    with BuildSketch(Plane(origin=(0, 0, 0), x_dir=(1, 0, 0), z_dir=(0, 1, 0)).offset(FILLET4_START)):
        with BuildLine():
            Line((2.03, 2.749455314), (2.03, 6))
            ThreePointArc((2.03, 6), (0.428490728, 4.324777263), (-1.515640098, 3.063207407))
            ThreePointArc((-1.515640098, 3.063207407), (0.301250097, 3.404357928), (2.03, 2.749455314))
        make_face()
        with BuildLine():
            ThreePointArc((2.03, -2.749455314), (0.301250097, -3.404357928), (-1.515640098, -3.063207407))
            ThreePointArc((-1.515640098, -3.063207407), (0.428490728, -4.324777263), (2.03, -6))
            Line((2.03, -6), (2.03, -2.749455314))
        make_face()
    extrude(amount=FILLET4_DEPTH)

    # Fillet4 2 outline → Fillet4 2 (add)
    with BuildSketch(Plane(origin=(0, 0, 0), x_dir=(1, 0, 0), z_dir=(0, 1, 0)).offset(FILLET4_START_2)):
        with BuildLine():
            Line((2.03, 2.749455314), (2.03, 6))
            ThreePointArc((2.03, 6), (0.428490728, 4.324777263), (-1.515640098, 3.063207407))
            ThreePointArc((-1.515640098, 3.063207407), (0.301250097, 3.404357928), (2.03, 2.749455314))
        make_face()
        with BuildLine():
            ThreePointArc((2.03, -2.749455314), (0.301250097, -3.404357928), (-1.515640098, -3.063207407))
            ThreePointArc((-1.515640098, -3.063207407), (0.428490728, -4.324777263), (2.03, -6))
            Line((2.03, -6), (2.03, -2.749455314))
        make_face()
    extrude(amount=FILLET4_2_DEPTH)

    # Fillet4 3 outline → Fillet4 3 (revolve, cut)
    with BuildSketch(Plane.XY):
        Polygon((6.334106093, 28.625349757), (3.41766068, 28.625349757), (6.41766068, 25.625349657), (6.41766068, 28.62535645), align=None)
    revolve(axis=Axis((0, 0, 0), (0, 1, 0)), mode=Mode.SUBTRACT)

    # Chamfer2
    chamfer2_edges = [part.edges().sort_by_distance(p)[0] for p in [
        (-2.903476201, 23, 1.80283956),
        (0.428490728, 23, -4.324777263),
        (0.428490728, 23, 4.324777263),
    ]]
    chamfer(chamfer2_edges, length=CHAMFER2_SIZE)


solid = part.part
